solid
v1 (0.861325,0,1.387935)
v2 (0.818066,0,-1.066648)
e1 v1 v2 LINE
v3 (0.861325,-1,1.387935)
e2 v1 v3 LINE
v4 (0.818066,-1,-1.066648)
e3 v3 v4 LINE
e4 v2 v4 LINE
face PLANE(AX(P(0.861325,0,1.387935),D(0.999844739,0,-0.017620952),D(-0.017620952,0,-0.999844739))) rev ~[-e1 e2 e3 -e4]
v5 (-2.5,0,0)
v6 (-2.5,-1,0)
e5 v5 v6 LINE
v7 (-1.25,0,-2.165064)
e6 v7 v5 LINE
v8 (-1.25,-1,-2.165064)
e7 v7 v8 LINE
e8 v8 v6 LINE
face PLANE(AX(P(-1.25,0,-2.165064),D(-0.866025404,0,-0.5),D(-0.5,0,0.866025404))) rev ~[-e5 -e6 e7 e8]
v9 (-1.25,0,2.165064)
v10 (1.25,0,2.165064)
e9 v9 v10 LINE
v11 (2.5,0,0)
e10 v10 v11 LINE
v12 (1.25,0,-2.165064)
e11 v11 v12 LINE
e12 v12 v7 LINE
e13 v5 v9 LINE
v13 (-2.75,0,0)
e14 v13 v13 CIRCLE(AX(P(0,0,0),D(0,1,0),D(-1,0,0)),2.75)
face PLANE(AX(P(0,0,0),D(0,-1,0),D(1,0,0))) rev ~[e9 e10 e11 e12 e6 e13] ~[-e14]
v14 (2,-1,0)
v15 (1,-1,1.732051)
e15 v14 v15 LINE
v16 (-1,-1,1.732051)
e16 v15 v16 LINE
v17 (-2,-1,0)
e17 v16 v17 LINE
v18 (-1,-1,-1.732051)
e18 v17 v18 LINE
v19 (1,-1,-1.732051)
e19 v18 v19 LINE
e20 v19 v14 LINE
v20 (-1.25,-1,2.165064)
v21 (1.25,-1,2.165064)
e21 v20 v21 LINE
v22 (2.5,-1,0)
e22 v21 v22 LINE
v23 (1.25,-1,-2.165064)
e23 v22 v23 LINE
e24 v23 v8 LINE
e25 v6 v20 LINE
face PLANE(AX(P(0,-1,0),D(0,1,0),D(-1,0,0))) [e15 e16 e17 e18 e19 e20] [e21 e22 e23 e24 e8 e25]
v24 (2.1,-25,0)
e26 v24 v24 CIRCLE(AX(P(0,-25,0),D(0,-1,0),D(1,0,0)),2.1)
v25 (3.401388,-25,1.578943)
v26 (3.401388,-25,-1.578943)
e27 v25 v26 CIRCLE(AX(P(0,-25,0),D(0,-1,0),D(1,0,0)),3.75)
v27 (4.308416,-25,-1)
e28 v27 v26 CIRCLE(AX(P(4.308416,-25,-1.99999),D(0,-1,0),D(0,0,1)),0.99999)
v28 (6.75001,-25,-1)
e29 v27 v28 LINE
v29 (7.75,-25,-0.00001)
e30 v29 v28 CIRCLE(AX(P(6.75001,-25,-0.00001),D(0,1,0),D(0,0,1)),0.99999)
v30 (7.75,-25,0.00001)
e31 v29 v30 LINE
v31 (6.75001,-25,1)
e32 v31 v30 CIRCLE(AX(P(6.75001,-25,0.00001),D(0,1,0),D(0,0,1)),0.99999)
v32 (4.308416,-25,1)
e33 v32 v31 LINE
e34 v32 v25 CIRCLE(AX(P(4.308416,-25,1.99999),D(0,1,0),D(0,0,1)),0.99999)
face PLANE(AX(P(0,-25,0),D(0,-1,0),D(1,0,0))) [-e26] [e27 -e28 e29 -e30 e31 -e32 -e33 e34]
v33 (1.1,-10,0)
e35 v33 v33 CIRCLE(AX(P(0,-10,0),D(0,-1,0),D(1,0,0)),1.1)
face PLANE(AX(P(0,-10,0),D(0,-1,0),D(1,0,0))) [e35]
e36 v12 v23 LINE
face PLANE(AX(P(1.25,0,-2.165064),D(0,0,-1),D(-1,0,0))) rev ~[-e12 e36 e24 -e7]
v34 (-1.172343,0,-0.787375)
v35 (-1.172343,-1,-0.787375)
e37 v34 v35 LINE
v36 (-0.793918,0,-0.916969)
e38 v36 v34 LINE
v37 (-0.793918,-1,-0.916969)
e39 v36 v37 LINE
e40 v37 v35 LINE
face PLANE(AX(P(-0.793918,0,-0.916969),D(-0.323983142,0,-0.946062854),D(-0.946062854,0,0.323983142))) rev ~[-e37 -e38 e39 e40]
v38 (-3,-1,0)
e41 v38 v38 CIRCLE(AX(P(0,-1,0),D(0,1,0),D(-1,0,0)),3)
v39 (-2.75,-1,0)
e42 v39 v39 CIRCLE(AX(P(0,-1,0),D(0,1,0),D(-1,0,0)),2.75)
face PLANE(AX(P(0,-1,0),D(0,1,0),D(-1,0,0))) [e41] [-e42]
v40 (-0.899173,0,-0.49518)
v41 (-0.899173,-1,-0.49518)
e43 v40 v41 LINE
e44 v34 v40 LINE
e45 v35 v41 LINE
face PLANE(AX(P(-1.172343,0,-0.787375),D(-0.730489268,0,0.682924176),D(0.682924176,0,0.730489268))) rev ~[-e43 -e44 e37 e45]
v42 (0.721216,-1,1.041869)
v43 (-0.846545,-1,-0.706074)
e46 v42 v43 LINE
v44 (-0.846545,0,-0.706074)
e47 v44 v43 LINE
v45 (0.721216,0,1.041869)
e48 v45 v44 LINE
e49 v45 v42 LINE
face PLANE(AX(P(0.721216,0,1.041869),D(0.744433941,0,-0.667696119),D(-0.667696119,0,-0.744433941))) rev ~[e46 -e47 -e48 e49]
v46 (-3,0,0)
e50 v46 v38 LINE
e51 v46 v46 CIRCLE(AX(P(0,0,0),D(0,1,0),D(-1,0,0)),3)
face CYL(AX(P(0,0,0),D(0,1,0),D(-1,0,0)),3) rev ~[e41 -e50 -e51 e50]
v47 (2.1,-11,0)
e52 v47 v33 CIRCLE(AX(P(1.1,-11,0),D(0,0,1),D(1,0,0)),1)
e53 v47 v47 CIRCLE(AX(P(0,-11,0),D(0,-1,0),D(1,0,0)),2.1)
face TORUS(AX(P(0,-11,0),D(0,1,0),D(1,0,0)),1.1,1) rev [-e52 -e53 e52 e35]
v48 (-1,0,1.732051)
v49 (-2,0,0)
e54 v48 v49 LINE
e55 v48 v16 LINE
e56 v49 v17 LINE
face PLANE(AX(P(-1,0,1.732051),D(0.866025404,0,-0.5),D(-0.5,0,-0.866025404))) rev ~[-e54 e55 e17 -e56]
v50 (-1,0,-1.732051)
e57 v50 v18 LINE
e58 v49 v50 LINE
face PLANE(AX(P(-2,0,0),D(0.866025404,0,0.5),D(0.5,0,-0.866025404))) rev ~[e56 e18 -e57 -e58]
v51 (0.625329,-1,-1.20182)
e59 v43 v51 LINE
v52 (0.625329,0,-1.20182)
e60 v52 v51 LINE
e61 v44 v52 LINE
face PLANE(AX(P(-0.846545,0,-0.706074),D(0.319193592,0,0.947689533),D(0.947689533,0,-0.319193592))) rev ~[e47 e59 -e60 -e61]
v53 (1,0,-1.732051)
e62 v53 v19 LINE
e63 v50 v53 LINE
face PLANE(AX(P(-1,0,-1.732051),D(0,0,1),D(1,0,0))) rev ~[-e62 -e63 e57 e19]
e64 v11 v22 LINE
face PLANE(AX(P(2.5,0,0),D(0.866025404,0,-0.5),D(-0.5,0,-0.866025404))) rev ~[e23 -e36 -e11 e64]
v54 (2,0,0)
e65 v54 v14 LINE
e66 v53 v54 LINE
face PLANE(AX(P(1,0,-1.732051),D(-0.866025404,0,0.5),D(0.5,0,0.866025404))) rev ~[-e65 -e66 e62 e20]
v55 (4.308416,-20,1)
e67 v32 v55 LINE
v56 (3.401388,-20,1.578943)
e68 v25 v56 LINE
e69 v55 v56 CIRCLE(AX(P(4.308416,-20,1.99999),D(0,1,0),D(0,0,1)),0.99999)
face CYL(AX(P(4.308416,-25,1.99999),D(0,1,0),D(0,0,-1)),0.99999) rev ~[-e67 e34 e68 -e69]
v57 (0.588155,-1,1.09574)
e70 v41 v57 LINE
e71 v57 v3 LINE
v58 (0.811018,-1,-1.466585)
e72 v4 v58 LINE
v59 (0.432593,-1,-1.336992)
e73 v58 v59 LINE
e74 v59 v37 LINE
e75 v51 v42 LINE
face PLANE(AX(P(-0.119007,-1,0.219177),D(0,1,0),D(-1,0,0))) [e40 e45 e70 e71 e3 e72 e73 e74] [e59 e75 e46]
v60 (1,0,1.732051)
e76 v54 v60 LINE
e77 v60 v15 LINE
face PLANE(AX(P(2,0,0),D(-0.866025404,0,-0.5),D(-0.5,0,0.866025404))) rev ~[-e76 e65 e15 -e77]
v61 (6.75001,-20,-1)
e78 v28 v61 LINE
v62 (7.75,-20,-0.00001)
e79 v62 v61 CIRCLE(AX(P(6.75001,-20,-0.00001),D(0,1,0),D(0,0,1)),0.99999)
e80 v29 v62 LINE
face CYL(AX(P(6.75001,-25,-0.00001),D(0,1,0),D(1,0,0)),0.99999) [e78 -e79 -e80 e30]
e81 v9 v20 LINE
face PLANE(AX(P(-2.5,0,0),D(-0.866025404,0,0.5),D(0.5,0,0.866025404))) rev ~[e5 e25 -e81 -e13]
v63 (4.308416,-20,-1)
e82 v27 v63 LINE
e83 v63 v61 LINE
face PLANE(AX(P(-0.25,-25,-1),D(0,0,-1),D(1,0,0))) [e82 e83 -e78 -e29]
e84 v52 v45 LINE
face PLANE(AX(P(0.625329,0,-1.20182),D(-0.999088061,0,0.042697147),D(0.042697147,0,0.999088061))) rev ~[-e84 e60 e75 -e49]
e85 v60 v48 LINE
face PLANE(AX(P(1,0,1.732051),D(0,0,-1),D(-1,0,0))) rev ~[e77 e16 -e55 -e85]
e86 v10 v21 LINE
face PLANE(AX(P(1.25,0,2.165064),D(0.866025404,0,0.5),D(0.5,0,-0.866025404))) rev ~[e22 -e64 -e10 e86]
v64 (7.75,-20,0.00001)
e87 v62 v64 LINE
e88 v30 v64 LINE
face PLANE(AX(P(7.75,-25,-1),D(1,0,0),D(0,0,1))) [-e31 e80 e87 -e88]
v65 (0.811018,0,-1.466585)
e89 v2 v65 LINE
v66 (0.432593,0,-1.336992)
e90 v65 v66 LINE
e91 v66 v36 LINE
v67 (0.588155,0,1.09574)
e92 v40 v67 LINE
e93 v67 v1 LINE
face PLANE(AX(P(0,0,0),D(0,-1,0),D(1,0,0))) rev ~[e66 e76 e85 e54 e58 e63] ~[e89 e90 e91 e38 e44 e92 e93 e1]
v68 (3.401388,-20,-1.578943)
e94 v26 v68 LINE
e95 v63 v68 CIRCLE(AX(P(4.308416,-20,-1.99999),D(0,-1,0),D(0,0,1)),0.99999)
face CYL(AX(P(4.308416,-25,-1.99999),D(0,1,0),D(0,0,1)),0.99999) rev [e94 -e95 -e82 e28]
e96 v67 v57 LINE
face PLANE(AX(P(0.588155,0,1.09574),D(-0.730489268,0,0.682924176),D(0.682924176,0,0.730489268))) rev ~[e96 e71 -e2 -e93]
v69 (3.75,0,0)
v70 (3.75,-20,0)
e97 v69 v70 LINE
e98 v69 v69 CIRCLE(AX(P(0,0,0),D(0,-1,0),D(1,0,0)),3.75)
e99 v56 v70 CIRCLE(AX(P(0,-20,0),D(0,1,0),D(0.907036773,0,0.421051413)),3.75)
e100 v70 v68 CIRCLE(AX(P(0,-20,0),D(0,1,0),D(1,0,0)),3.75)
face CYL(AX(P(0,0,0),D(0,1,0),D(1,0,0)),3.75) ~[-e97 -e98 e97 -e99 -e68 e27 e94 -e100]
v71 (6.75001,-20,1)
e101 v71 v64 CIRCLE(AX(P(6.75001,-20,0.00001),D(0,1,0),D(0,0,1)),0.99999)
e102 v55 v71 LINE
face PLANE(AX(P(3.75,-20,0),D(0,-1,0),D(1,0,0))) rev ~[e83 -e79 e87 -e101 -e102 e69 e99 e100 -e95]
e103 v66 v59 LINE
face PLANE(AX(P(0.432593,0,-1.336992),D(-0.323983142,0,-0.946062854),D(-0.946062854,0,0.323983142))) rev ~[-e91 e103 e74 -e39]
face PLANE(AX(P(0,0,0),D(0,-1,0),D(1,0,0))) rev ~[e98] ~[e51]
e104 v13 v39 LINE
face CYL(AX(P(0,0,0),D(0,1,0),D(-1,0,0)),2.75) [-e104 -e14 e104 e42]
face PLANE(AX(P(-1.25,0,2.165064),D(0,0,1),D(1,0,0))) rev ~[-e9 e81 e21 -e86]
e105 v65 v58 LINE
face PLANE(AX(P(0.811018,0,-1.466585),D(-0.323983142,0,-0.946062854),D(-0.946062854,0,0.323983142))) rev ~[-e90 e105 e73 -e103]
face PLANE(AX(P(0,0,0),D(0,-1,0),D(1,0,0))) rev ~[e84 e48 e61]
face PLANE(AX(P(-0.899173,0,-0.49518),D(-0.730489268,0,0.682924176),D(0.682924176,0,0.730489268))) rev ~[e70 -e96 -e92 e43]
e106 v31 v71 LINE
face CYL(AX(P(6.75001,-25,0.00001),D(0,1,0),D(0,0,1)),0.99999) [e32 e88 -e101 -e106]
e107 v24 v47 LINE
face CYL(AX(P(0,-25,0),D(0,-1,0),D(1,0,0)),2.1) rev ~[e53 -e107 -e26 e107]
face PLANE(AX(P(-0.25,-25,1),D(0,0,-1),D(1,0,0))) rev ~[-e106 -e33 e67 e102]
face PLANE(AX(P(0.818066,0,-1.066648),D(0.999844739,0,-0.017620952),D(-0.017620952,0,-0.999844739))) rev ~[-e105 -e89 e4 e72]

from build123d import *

# Parameters (mm, degrees)
F0_R     = 3.75
F1_DEPTH = 25
F2_W     = 8
F2_H     = 2
F3_DEPTH = 5
F4_R     = 0.99999
F5_R     = 2.1
F6_DEPTH = 15
F7_R     = 3
F7_R_2   = 2.75
F8_DEPTH = 1
F9_R     = 1


# Not quite as in the source:
# - a fillet or chamfer is up to 0.001 mm smaller than in the source, because OpenCascade refuses the exact size


with BuildPart() as f1:
    # F0 (on Front) → F1 (new body)
    with BuildSketch(Plane.XZ):
        Circle(F0_R)
    extrude(amount=F1_DEPTH)

    # F2 (on face) → F3 (join)
    with BuildSketch(Plane.XZ.offset(25)):
        with Locations((3.75, 0)):
            Rectangle(F2_W, F2_H)
    extrude(amount=-F3_DEPTH)

    # F4 (radius 1 in the source; OpenCascade refuses exactly that, so slightly less here)
    f4_edges = [f1.edges().sort_by_distance(p)[0] for p in [
        (3.614208, -22.5, 1),
        (3.614208, -22.5, -1),
        (7.75, -22.5, 1),
        (7.75, -22.5, -1),
    ]]
    fillet(f4_edges, radius=F4_R)

    # F5 (on face) → F6 (cut)
    with BuildSketch(Plane.XZ.offset(25)):
        Circle(F5_R)
    extrude(amount=-F6_DEPTH, mode=Mode.SUBTRACT)

    # F7 (on face) → F8 (cut)
    with BuildSketch(Plane(origin=(0, 0, 0), x_dir=(-1, 0, 0), z_dir=(0, 1, 0))):
        Circle(F7_R)
        Circle(F7_R_2, mode=Mode.SUBTRACT)
        Polygon((1.25, -2.1650635095), (2.5, 0), (1.25, 2.1650635095), (-1.25, 2.1650635095), (-2.5, 0), (-1.25, -2.1650635095), align=None)
        with BuildLine():
            ThreePointArc((1, 1.7320508076), (1.7320508076, 1), (2, 0))
            ThreePointArc((2, 0), (1.7320508076, -1), (1, -1.7320508076))
            ThreePointArc((1, -1.7320508076), (0, -2), (-1, -1.7320508076))
            ThreePointArc((-1, -1.7320508076), (-1.7320508076, -1), (-2, 0))
            ThreePointArc((-2, 0), (-1.7320508076, 1), (-1, 1.7320508076))
            ThreePointArc((-1, 1.7320508076), (0, 2), (1, 1.7320508076))
        make_face(mode=Mode.SUBTRACT)
        with BuildLine():
            Line((-2, 0), (-1, 1.7320508076))
            ThreePointArc((-1, 1.7320508076), (-1.7320508076, 1), (-2, 0))
        make_face()
        with BuildLine():
            Line((-1, 1.7320508076), (1, 1.7320508076))
            ThreePointArc((1, 1.7320508076), (0, 2), (-1, 1.7320508076))
        make_face()
        with BuildLine():
            ThreePointArc((-2, 0), (-1.7320508076, -1), (-1, -1.7320508076))
            Line((-1, -1.7320508076), (-2, 0))
        make_face()
        with BuildLine():
            ThreePointArc((1, -1.7320508076), (1.7320508076, -1), (2, 0))
            Line((2, 0), (1.5, -0.8660254038))
            Line((1.5, -0.8660254038), (1, -1.7320508076))
        make_face()
        with BuildLine():
            Line((1, 1.7320508076), (2, 0))
            ThreePointArc((2, 0), (1.7320508076, 1), (1, 1.7320508076))
        make_face()
        with BuildLine():
            ThreePointArc((-1, -1.7320508076), (0, -2), (1, -1.7320508076))
            Line((1, -1.7320508076), (-1, -1.7320508076))
        make_face()
        Polygon((0.8465453085, -0.7060742072), (0.8991730442, -0.4951797253), (-0.5881552807, 1.095739762), (-0.7212159254, 1.0418686678), align=None)
        Polygon((-0.7212159254, 1.0418686678), (-0.85427657, 0.9879975736), (-0.8180661444, -1.0666475449), (-0.6253293831, -1.2018198644), align=None)
        Polygon((-0.4325926219, -1.3369921838), (0.7939175728, -0.9169686891), (0.8465453085, -0.7060742072), (-0.6253293831, -1.2018198644), align=None)
        Polygon((-0.8180661444, -1.0666475449), (-0.8110177635, -1.4665854405), (-0.4325926219, -1.3369921838), (-0.6253293831, -1.2018198644), align=None)
        Polygon((0.7939175728, -0.9169686891), (1.1723427144, -0.7873754324), (0.8991730442, -0.4951797253), (0.8465453085, -0.7060742072), align=None)
        Polygon((-0.5881552807, 1.095739762), (-0.8613249509, 1.3879354691), (-0.85427657, 0.9879975736), (-0.7212159254, 1.0418686678), align=None)
    extrude(amount=-F8_DEPTH, mode=Mode.SUBTRACT)

    # F9
    f9_edges = [f1.edges().sort_by_distance(p)[0] for p in [
        (-2.1, -10, 0),
    ]]
    fillet(f9_edges, radius=F9_R)


solid = f1.part
